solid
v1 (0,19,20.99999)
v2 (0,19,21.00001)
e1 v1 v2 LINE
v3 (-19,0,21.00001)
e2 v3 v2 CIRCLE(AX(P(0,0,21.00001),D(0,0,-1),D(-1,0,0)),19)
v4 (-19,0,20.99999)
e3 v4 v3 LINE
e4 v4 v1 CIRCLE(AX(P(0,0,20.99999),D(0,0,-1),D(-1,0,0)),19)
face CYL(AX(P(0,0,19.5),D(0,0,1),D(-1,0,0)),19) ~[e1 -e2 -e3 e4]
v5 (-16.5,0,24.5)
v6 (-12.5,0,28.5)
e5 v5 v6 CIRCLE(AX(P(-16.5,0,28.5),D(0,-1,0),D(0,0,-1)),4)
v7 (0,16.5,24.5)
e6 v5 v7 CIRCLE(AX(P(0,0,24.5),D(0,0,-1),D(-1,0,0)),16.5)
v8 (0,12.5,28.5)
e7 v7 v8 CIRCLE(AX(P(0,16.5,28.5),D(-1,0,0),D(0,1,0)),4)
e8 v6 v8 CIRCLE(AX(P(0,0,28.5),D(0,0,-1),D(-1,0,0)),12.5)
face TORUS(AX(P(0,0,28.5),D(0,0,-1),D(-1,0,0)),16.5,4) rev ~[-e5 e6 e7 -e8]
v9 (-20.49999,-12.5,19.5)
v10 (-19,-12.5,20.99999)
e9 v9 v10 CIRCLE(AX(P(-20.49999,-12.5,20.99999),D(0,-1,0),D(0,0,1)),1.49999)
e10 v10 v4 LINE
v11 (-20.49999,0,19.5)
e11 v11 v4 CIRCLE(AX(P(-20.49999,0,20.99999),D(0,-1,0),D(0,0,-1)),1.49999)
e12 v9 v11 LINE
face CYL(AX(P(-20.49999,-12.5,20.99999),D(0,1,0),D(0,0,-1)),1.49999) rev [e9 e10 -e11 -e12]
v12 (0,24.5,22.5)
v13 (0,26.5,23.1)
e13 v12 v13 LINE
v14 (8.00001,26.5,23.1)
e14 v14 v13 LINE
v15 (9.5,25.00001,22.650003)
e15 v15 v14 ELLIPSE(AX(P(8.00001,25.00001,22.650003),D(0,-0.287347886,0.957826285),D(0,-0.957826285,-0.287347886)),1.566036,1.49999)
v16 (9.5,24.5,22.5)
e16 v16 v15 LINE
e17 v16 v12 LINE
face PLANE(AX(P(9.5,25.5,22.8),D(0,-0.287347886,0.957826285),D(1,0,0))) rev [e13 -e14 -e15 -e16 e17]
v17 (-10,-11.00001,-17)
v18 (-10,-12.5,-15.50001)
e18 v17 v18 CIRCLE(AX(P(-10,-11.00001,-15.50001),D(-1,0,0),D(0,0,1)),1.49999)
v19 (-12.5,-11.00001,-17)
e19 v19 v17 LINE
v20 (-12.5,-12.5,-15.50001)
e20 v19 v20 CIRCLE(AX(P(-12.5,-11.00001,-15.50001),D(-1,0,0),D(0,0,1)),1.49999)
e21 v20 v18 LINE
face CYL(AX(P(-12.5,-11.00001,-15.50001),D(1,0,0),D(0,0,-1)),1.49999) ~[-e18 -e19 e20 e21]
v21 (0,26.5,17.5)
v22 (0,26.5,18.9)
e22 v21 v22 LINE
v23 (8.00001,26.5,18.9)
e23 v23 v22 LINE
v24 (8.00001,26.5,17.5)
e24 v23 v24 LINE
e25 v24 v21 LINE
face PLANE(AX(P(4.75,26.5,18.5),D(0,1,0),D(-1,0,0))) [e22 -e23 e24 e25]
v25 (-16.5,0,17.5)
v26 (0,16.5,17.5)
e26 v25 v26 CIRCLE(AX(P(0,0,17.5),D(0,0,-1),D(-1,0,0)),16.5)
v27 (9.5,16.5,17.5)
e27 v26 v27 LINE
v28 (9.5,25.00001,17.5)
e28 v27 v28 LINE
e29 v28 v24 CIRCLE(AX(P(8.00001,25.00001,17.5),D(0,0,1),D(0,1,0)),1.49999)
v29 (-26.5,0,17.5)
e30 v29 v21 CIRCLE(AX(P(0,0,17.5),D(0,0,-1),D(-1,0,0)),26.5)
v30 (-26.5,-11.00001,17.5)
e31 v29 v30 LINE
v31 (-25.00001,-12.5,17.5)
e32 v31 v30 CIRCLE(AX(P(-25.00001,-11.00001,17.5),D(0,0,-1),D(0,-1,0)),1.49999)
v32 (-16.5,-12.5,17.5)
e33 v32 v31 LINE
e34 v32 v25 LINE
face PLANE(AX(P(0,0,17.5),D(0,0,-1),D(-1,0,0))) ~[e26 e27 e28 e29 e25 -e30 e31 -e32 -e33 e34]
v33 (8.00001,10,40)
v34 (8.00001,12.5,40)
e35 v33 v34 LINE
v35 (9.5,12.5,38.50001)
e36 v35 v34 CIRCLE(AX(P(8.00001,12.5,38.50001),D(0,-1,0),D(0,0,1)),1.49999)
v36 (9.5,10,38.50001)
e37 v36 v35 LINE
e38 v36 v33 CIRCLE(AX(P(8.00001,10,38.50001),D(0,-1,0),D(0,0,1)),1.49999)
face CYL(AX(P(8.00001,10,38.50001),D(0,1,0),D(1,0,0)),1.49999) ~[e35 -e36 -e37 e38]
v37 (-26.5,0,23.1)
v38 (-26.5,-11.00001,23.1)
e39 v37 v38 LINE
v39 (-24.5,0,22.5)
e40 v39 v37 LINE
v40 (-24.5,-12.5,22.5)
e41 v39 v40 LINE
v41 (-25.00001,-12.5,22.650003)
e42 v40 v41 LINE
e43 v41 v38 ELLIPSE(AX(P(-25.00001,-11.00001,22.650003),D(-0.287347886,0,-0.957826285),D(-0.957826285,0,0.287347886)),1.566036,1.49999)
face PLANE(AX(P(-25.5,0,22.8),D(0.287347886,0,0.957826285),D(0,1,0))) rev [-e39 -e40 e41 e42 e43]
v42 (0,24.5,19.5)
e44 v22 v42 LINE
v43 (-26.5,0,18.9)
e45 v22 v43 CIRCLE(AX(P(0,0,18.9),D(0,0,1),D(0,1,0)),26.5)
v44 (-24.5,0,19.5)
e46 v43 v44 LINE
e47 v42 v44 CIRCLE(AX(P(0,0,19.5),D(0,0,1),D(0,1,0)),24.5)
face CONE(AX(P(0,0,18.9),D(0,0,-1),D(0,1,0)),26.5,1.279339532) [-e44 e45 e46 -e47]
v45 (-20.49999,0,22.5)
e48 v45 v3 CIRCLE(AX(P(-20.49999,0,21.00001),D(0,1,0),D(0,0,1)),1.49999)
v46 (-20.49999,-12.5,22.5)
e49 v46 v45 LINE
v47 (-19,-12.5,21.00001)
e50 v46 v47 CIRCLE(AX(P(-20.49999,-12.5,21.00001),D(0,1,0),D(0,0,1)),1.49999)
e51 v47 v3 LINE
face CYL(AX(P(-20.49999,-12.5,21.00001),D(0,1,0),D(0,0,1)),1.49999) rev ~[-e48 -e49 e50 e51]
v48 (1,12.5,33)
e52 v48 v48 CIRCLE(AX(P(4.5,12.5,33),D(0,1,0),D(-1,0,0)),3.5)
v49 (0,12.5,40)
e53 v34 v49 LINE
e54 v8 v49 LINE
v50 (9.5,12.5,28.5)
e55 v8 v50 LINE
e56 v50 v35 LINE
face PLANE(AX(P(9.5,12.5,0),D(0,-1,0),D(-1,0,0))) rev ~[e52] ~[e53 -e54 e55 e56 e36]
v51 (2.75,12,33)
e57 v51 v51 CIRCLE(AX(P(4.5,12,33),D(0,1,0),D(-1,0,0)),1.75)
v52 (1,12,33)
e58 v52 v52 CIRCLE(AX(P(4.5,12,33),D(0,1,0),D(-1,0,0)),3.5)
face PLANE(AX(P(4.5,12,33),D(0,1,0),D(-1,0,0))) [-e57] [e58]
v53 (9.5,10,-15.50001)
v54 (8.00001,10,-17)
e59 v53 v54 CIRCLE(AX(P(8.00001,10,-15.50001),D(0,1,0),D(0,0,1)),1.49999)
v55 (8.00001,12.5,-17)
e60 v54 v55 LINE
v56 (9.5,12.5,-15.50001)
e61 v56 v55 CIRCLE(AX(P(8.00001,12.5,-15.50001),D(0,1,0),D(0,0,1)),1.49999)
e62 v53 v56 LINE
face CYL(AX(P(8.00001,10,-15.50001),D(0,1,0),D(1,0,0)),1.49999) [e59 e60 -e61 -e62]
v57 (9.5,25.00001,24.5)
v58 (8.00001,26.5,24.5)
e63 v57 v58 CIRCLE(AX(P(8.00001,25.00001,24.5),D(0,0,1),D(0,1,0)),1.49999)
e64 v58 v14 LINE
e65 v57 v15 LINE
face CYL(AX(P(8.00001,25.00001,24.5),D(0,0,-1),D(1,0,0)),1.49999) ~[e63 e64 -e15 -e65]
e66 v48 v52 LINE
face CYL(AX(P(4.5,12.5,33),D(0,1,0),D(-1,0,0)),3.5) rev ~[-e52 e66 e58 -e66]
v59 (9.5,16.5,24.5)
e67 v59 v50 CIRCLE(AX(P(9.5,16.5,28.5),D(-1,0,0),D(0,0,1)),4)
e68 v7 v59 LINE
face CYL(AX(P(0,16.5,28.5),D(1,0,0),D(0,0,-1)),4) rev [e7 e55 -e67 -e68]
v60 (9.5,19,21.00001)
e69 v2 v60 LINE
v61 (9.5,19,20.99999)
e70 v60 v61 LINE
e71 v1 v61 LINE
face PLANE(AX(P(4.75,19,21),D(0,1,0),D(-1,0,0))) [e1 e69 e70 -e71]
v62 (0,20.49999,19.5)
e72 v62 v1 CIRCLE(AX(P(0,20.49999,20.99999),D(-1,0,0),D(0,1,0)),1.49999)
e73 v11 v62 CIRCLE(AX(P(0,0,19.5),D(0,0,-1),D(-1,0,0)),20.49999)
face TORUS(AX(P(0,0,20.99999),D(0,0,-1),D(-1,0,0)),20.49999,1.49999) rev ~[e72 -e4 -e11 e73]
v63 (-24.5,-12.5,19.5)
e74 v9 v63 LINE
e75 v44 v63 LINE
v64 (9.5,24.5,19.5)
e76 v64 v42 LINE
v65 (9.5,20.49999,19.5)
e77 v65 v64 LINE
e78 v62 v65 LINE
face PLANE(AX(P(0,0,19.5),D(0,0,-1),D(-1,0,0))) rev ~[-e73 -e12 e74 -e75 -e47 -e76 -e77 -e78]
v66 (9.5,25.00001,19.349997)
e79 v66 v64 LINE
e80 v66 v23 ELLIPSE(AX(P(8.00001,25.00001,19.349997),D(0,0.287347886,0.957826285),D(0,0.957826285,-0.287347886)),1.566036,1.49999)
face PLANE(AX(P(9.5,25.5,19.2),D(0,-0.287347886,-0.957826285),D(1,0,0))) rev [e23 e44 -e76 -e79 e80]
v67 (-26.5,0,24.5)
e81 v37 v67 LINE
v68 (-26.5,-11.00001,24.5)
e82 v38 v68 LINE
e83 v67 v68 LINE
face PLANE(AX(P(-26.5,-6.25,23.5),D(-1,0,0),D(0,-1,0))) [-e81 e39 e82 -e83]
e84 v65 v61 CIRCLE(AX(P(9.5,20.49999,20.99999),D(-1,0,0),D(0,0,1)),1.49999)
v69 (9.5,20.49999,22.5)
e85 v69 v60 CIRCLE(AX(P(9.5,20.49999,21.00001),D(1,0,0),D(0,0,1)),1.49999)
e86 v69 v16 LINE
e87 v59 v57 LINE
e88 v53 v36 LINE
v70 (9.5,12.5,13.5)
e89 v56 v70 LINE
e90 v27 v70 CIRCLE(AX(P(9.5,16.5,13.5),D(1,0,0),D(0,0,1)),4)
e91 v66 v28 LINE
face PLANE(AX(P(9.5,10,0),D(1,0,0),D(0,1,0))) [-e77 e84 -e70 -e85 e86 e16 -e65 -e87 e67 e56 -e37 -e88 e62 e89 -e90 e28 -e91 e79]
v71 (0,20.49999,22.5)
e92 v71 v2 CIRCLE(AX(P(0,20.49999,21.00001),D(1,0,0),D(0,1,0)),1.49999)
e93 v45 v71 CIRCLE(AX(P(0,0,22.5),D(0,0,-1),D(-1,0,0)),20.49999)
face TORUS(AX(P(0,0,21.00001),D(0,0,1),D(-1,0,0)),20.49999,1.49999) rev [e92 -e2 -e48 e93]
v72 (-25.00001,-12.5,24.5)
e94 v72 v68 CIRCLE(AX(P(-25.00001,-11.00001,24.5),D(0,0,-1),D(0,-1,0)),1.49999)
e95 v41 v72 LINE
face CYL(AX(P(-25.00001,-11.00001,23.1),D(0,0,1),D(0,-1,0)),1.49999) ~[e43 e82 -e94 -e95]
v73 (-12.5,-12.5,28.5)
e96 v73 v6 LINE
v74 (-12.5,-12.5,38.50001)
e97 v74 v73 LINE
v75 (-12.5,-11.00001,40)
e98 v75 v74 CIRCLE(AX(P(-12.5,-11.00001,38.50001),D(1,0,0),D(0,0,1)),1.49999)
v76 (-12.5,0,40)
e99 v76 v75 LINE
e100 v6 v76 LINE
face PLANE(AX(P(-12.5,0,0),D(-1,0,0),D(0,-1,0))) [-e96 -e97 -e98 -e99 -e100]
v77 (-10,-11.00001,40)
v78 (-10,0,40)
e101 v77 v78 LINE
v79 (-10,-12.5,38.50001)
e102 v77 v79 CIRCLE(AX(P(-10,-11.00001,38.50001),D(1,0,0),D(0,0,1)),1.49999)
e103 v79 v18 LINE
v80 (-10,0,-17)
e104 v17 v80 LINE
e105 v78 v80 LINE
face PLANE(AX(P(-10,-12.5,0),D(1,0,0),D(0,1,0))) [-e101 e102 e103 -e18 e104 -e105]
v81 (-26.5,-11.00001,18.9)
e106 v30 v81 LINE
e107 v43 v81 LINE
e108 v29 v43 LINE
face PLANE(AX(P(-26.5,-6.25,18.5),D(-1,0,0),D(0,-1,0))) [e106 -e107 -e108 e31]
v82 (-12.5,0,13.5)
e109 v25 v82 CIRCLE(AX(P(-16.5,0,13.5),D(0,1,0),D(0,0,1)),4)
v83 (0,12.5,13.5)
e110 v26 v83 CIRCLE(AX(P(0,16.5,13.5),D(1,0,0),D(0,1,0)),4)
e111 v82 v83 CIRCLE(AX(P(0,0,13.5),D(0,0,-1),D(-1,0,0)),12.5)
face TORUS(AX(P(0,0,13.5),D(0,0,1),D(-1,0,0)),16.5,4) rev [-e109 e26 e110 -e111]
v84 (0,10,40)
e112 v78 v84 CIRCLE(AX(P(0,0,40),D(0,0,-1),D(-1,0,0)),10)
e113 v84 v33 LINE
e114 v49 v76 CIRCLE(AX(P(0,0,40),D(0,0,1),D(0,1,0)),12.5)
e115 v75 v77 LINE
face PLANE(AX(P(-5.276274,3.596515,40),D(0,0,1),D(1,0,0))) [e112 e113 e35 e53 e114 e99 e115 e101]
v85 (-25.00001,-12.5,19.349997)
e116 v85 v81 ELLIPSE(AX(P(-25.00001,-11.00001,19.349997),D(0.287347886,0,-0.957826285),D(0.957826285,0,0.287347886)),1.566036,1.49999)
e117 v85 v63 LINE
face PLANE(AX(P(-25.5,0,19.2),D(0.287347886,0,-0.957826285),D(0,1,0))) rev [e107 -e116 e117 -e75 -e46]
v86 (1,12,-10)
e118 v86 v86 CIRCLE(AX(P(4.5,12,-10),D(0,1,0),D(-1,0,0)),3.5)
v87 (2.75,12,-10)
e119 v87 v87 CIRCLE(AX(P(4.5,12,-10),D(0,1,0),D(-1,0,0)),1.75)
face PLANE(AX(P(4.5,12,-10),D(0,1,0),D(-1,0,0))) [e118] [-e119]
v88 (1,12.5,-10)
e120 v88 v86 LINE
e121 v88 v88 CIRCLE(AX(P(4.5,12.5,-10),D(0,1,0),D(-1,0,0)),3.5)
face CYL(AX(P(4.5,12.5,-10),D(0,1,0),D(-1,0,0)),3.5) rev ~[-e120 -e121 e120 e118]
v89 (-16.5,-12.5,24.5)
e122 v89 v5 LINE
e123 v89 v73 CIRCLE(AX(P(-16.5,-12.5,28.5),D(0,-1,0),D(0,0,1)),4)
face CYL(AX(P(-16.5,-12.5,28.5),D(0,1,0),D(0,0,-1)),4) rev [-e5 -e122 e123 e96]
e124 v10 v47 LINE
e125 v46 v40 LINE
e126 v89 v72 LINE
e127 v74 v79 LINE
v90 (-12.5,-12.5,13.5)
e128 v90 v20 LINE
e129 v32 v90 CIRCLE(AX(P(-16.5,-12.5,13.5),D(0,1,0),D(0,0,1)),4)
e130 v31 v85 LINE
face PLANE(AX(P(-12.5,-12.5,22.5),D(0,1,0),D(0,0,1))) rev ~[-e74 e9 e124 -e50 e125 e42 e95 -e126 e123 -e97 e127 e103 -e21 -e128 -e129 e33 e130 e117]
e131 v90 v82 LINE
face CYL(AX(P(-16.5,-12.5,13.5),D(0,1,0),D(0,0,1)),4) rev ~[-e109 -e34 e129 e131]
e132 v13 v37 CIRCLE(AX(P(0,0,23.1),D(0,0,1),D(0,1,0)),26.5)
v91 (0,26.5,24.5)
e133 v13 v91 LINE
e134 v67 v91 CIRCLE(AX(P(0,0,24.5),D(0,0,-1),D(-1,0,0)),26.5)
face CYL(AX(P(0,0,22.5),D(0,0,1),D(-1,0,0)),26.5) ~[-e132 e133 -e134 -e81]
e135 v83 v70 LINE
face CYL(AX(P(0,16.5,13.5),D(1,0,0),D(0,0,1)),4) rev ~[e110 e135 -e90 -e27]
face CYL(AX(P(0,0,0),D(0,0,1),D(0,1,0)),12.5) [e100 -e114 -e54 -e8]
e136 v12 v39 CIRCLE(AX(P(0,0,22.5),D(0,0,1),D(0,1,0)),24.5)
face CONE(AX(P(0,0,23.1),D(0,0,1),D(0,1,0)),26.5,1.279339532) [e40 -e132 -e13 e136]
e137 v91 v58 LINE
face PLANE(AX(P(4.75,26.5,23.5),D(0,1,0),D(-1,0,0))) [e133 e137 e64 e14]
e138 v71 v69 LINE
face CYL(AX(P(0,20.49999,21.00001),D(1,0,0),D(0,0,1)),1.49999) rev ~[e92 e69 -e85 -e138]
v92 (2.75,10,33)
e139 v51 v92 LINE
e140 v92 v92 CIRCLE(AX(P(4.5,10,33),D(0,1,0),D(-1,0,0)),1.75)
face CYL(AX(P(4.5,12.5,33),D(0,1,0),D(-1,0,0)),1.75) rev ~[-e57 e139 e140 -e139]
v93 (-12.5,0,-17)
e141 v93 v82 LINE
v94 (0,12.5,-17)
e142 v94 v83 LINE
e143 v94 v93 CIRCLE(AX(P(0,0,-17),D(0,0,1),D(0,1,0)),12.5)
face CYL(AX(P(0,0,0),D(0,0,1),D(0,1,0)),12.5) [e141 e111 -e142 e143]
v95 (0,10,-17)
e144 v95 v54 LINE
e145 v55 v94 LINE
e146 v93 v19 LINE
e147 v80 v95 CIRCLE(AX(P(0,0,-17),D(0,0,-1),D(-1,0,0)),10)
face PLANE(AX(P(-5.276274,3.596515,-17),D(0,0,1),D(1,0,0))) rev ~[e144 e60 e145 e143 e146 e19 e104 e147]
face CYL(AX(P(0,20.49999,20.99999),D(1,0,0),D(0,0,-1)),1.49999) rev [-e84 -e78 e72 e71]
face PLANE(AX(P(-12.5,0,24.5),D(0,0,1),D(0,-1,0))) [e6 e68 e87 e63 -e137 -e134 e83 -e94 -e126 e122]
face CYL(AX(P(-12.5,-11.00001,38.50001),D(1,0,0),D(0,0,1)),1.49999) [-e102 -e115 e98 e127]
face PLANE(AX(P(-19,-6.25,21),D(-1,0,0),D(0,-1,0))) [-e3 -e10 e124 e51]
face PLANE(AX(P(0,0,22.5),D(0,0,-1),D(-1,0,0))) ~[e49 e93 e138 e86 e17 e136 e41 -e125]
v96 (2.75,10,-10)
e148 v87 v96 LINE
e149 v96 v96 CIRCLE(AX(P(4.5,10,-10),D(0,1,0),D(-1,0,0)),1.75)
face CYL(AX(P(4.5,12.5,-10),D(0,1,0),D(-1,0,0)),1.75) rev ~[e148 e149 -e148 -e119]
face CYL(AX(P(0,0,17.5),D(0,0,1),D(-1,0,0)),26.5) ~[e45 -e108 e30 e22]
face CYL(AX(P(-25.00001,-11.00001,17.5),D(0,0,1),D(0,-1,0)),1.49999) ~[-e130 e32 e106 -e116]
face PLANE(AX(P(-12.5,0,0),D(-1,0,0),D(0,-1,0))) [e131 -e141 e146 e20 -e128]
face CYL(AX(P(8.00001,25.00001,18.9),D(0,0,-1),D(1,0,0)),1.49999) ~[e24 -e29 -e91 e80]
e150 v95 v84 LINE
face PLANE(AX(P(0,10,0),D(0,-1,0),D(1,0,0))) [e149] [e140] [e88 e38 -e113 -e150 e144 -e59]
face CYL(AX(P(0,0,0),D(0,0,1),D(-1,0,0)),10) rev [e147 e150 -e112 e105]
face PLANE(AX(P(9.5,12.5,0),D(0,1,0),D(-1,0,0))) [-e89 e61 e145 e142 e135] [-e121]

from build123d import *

# Parameters (mm, degrees)
F1_DEPTH  = 40
F3_DEPTH  = 6.5
F4_DEPTH  = 14
F5_R      = 3.5
F5_R_2    = 1.75
F6_DEPTH  = 0.5
F7_DEPTH  = 25
F8_DEPTH  = 17
F9_R      = 1.75
F10_DEPTH = 3
F9_R_2    = 3.5
F11_DEPTH = 0.5
F12_W     = 12.5
F12_H     = 3
F13_DEPTH = 6.5
F12_H_2   = 2
F14_DEPTH = 14
F15_ANGLE = 90
F16_R     = 4
F17_SIZE2 = 2
F17_SIZE  = 0.6
F18_SIZE2 = 0.6
F18_SIZE  = 2
F19_R     = 1.49999


# Not quite as in the source:
# - a fillet or chamfer is up to 0.001 mm smaller than in the source, because OpenCascade refuses the exact size


with BuildPart() as f1:
    # F0 (on Top) → F1 (new body)
    with BuildSketch(Plane.XY):
        with BuildLine():
            ThreePointArc((-10, 0), (-7.0710678119, 7.0710678119), (0, 10))
            Line((0, 10), (9.5, 10))
            Line((9.5, 10), (9.5, 12.5))
            Line((9.5, 12.5), (0, 12.5))
            ThreePointArc((0, 12.5), (-8.8388347648, 8.8388347648), (-12.5, 0))
            Line((-12.5, 0), (-12.5, -12.5))
            Line((-12.5, -12.5), (-10, -12.5))
            Line((-10, -12.5), (-10, 0))
        make_face()
    extrude(amount=F1_DEPTH)

    # F2 (on face) → F3 (join)
    with BuildSketch(Plane(origin=(0, 12.5, 0), x_dir=(-1, 0, 0), z_dir=(0, 1, 0))):
        Polygon((-5.7388888672, 22.5), (-9.5, 22.5), (-9.5, 19.5), (-5.7327155955, 19.5), (0, 19.5), (0, 22.5), align=None)
    extrude(amount=F3_DEPTH)

    # F2 (on face) → F4 (join)
    with BuildSketch(Plane(origin=(0, 12.5, 0), x_dir=(-1, 0, 0), z_dir=(0, 1, 0))):
        Polygon((-5.7188421488, 24.5), (-9.5, 24.5), (-9.5, 22.5), (-5.7388888672, 22.5), (0, 22.5), (0, 24.5), align=None)
        Polygon((-5.7327155955, 19.5), (-9.5, 19.5), (-9.5, 17.5), (-5.7445626465, 17.5), (0, 17.5), (0, 19.5), align=None)
    extrude(amount=F4_DEPTH)

    # F5 (on face) → F6 (cut)
    with BuildSketch(Plane(origin=(0, 12.5, 0), x_dir=(-1, 0, 0), z_dir=(0, 1, 0))):
        with Locations((-4.5, 33)):
            Circle(F5_R)
        with Locations((-4.5, 33)):
            Circle(F5_R_2, mode=Mode.SUBTRACT)
    extrude(amount=-F6_DEPTH, mode=Mode.SUBTRACT)

    # F5 (on face) → F7 (cut)
    with BuildSketch(Plane(origin=(0, 12.5, 0), x_dir=(-1, 0, 0), z_dir=(0, 1, 0))):
        with Locations((-4.5, 33)):
            Circle(F5_R_2)
    extrude(amount=-F7_DEPTH, mode=Mode.SUBTRACT)

    # F8 (add): a face of the model
    f8_faces = [f1.faces().sort_by_distance(p)[0] for p in [
        (-7.3065460487, 7.3065460487, 0),
    ]]
    extrude(f8_faces, amount=F8_DEPTH)

    # F9 (on face) → F10 (cut)
    with BuildSketch(Plane(origin=(0, 12.5, 0), x_dir=(-1, 0, 0), z_dir=(0, 1, 0))):
        with Locations((-4.5, -10)):
            Circle(F9_R)
    extrude(amount=-F10_DEPTH, mode=Mode.SUBTRACT)

    # F9 (on face) → F11 (cut)
    with BuildSketch(Plane(origin=(0, 12.5, 0), x_dir=(-1, 0, 0), z_dir=(0, 1, 0))):
        with Locations((-4.5, -10)):
            Circle(F9_R_2)
        with Locations((-4.5, -10)):
            Circle(F9_R, mode=Mode.SUBTRACT)
    extrude(amount=-F11_DEPTH, mode=Mode.SUBTRACT)

    # F12 (on face) → F13 (join)
    with BuildSketch(Plane(origin=(-12.5, 0, 0), x_dir=(0, -1, 0), z_dir=(-1, 0, 0))):
        with Locations((6.25, 21)):
            Rectangle(F12_W, F12_H)
    extrude(amount=F13_DEPTH)

    # F12 (on face) → F14 (join)
    with BuildSketch(Plane(origin=(-12.5, 0, 0), x_dir=(0, -1, 0), z_dir=(-1, 0, 0))):
        with Locations((6.25, 23.5)):
            Rectangle(F12_W, F12_H_2)
        with Locations((6.25, 18.5)):
            Rectangle(F12_W, F12_H_2)
    extrude(amount=F14_DEPTH)

    # F14_face (on face) → F15 (revolve)
    with BuildSketch(Plane(origin=(-18.5314569536, 0, 21), x_dir=(-1, 0, 0), z_dir=(0, 1, 0))):
        Polygon((7.9685430464, -1.5), (0.4685430464, -1.5), (0.4685430464, 1.5), (7.9685430464, 1.5), (7.9685430464, 3.5), (-6.0314569536, 3.5), (-6.0314569536, -3.5), (7.9685430464, -3.5), align=None)
    revolve(axis=Axis((0, 0, 0), (0, 0, -1)), revolution_arc=F15_ANGLE)

    # F16
    f16_edges = [f1.edges().sort_by_distance(p)[0] for p in [
        (-8.838835, 8.838835, 17.5),
        (-8.838835, 8.838835, 24.5),
    ]]
    fillet(f16_edges, radius=F16_R)

    # F17
    f17_edges = [f1.edges().sort_by_distance(p)[0] for p in [
        (-26.5, -6.25, 19.5),
    ]]
    f17_side = f1.faces().sort_by_distance((-26.5, -6.25, 18.5))[0]
    chamfer(f17_edges, length=F17_SIZE, length2=F17_SIZE2, reference=f17_side)

    # F18
    f18_edges = [f1.edges().sort_by_distance(p)[0] for p in [
        (-26.5, -6.25, 22.5),
    ]]
    f18_side = f1.faces().sort_by_distance((-19.530754, -6.25, 22.5))[0]
    chamfer(f18_edges, length=F18_SIZE, length2=F18_SIZE2, reference=f18_side)

    # F19 (radius 1.5 in the source; OpenCascade refuses exactly that, so slightly less here)
    f19_edges = [f1.edges().sort_by_distance(p)[0] for p in [
        (-13.435029, 13.435029, 19.5),
        (-13.435029, 13.435029, 22.5),
        (9.5, 26.5, 23.8),
        (9.5, 26.5, 18.2),
        (-26.5, -12.5, 18.2),
        (-26.5, -12.5, 23.8),
        (-11.25, -12.5, 40),
        (9.5, 11.25, 40),
        (9.5, 11.25, -17),
        (-11.25, -12.5, -17),
    ]]
    fillet(f19_edges, radius=F19_R)


solid = f1.part
